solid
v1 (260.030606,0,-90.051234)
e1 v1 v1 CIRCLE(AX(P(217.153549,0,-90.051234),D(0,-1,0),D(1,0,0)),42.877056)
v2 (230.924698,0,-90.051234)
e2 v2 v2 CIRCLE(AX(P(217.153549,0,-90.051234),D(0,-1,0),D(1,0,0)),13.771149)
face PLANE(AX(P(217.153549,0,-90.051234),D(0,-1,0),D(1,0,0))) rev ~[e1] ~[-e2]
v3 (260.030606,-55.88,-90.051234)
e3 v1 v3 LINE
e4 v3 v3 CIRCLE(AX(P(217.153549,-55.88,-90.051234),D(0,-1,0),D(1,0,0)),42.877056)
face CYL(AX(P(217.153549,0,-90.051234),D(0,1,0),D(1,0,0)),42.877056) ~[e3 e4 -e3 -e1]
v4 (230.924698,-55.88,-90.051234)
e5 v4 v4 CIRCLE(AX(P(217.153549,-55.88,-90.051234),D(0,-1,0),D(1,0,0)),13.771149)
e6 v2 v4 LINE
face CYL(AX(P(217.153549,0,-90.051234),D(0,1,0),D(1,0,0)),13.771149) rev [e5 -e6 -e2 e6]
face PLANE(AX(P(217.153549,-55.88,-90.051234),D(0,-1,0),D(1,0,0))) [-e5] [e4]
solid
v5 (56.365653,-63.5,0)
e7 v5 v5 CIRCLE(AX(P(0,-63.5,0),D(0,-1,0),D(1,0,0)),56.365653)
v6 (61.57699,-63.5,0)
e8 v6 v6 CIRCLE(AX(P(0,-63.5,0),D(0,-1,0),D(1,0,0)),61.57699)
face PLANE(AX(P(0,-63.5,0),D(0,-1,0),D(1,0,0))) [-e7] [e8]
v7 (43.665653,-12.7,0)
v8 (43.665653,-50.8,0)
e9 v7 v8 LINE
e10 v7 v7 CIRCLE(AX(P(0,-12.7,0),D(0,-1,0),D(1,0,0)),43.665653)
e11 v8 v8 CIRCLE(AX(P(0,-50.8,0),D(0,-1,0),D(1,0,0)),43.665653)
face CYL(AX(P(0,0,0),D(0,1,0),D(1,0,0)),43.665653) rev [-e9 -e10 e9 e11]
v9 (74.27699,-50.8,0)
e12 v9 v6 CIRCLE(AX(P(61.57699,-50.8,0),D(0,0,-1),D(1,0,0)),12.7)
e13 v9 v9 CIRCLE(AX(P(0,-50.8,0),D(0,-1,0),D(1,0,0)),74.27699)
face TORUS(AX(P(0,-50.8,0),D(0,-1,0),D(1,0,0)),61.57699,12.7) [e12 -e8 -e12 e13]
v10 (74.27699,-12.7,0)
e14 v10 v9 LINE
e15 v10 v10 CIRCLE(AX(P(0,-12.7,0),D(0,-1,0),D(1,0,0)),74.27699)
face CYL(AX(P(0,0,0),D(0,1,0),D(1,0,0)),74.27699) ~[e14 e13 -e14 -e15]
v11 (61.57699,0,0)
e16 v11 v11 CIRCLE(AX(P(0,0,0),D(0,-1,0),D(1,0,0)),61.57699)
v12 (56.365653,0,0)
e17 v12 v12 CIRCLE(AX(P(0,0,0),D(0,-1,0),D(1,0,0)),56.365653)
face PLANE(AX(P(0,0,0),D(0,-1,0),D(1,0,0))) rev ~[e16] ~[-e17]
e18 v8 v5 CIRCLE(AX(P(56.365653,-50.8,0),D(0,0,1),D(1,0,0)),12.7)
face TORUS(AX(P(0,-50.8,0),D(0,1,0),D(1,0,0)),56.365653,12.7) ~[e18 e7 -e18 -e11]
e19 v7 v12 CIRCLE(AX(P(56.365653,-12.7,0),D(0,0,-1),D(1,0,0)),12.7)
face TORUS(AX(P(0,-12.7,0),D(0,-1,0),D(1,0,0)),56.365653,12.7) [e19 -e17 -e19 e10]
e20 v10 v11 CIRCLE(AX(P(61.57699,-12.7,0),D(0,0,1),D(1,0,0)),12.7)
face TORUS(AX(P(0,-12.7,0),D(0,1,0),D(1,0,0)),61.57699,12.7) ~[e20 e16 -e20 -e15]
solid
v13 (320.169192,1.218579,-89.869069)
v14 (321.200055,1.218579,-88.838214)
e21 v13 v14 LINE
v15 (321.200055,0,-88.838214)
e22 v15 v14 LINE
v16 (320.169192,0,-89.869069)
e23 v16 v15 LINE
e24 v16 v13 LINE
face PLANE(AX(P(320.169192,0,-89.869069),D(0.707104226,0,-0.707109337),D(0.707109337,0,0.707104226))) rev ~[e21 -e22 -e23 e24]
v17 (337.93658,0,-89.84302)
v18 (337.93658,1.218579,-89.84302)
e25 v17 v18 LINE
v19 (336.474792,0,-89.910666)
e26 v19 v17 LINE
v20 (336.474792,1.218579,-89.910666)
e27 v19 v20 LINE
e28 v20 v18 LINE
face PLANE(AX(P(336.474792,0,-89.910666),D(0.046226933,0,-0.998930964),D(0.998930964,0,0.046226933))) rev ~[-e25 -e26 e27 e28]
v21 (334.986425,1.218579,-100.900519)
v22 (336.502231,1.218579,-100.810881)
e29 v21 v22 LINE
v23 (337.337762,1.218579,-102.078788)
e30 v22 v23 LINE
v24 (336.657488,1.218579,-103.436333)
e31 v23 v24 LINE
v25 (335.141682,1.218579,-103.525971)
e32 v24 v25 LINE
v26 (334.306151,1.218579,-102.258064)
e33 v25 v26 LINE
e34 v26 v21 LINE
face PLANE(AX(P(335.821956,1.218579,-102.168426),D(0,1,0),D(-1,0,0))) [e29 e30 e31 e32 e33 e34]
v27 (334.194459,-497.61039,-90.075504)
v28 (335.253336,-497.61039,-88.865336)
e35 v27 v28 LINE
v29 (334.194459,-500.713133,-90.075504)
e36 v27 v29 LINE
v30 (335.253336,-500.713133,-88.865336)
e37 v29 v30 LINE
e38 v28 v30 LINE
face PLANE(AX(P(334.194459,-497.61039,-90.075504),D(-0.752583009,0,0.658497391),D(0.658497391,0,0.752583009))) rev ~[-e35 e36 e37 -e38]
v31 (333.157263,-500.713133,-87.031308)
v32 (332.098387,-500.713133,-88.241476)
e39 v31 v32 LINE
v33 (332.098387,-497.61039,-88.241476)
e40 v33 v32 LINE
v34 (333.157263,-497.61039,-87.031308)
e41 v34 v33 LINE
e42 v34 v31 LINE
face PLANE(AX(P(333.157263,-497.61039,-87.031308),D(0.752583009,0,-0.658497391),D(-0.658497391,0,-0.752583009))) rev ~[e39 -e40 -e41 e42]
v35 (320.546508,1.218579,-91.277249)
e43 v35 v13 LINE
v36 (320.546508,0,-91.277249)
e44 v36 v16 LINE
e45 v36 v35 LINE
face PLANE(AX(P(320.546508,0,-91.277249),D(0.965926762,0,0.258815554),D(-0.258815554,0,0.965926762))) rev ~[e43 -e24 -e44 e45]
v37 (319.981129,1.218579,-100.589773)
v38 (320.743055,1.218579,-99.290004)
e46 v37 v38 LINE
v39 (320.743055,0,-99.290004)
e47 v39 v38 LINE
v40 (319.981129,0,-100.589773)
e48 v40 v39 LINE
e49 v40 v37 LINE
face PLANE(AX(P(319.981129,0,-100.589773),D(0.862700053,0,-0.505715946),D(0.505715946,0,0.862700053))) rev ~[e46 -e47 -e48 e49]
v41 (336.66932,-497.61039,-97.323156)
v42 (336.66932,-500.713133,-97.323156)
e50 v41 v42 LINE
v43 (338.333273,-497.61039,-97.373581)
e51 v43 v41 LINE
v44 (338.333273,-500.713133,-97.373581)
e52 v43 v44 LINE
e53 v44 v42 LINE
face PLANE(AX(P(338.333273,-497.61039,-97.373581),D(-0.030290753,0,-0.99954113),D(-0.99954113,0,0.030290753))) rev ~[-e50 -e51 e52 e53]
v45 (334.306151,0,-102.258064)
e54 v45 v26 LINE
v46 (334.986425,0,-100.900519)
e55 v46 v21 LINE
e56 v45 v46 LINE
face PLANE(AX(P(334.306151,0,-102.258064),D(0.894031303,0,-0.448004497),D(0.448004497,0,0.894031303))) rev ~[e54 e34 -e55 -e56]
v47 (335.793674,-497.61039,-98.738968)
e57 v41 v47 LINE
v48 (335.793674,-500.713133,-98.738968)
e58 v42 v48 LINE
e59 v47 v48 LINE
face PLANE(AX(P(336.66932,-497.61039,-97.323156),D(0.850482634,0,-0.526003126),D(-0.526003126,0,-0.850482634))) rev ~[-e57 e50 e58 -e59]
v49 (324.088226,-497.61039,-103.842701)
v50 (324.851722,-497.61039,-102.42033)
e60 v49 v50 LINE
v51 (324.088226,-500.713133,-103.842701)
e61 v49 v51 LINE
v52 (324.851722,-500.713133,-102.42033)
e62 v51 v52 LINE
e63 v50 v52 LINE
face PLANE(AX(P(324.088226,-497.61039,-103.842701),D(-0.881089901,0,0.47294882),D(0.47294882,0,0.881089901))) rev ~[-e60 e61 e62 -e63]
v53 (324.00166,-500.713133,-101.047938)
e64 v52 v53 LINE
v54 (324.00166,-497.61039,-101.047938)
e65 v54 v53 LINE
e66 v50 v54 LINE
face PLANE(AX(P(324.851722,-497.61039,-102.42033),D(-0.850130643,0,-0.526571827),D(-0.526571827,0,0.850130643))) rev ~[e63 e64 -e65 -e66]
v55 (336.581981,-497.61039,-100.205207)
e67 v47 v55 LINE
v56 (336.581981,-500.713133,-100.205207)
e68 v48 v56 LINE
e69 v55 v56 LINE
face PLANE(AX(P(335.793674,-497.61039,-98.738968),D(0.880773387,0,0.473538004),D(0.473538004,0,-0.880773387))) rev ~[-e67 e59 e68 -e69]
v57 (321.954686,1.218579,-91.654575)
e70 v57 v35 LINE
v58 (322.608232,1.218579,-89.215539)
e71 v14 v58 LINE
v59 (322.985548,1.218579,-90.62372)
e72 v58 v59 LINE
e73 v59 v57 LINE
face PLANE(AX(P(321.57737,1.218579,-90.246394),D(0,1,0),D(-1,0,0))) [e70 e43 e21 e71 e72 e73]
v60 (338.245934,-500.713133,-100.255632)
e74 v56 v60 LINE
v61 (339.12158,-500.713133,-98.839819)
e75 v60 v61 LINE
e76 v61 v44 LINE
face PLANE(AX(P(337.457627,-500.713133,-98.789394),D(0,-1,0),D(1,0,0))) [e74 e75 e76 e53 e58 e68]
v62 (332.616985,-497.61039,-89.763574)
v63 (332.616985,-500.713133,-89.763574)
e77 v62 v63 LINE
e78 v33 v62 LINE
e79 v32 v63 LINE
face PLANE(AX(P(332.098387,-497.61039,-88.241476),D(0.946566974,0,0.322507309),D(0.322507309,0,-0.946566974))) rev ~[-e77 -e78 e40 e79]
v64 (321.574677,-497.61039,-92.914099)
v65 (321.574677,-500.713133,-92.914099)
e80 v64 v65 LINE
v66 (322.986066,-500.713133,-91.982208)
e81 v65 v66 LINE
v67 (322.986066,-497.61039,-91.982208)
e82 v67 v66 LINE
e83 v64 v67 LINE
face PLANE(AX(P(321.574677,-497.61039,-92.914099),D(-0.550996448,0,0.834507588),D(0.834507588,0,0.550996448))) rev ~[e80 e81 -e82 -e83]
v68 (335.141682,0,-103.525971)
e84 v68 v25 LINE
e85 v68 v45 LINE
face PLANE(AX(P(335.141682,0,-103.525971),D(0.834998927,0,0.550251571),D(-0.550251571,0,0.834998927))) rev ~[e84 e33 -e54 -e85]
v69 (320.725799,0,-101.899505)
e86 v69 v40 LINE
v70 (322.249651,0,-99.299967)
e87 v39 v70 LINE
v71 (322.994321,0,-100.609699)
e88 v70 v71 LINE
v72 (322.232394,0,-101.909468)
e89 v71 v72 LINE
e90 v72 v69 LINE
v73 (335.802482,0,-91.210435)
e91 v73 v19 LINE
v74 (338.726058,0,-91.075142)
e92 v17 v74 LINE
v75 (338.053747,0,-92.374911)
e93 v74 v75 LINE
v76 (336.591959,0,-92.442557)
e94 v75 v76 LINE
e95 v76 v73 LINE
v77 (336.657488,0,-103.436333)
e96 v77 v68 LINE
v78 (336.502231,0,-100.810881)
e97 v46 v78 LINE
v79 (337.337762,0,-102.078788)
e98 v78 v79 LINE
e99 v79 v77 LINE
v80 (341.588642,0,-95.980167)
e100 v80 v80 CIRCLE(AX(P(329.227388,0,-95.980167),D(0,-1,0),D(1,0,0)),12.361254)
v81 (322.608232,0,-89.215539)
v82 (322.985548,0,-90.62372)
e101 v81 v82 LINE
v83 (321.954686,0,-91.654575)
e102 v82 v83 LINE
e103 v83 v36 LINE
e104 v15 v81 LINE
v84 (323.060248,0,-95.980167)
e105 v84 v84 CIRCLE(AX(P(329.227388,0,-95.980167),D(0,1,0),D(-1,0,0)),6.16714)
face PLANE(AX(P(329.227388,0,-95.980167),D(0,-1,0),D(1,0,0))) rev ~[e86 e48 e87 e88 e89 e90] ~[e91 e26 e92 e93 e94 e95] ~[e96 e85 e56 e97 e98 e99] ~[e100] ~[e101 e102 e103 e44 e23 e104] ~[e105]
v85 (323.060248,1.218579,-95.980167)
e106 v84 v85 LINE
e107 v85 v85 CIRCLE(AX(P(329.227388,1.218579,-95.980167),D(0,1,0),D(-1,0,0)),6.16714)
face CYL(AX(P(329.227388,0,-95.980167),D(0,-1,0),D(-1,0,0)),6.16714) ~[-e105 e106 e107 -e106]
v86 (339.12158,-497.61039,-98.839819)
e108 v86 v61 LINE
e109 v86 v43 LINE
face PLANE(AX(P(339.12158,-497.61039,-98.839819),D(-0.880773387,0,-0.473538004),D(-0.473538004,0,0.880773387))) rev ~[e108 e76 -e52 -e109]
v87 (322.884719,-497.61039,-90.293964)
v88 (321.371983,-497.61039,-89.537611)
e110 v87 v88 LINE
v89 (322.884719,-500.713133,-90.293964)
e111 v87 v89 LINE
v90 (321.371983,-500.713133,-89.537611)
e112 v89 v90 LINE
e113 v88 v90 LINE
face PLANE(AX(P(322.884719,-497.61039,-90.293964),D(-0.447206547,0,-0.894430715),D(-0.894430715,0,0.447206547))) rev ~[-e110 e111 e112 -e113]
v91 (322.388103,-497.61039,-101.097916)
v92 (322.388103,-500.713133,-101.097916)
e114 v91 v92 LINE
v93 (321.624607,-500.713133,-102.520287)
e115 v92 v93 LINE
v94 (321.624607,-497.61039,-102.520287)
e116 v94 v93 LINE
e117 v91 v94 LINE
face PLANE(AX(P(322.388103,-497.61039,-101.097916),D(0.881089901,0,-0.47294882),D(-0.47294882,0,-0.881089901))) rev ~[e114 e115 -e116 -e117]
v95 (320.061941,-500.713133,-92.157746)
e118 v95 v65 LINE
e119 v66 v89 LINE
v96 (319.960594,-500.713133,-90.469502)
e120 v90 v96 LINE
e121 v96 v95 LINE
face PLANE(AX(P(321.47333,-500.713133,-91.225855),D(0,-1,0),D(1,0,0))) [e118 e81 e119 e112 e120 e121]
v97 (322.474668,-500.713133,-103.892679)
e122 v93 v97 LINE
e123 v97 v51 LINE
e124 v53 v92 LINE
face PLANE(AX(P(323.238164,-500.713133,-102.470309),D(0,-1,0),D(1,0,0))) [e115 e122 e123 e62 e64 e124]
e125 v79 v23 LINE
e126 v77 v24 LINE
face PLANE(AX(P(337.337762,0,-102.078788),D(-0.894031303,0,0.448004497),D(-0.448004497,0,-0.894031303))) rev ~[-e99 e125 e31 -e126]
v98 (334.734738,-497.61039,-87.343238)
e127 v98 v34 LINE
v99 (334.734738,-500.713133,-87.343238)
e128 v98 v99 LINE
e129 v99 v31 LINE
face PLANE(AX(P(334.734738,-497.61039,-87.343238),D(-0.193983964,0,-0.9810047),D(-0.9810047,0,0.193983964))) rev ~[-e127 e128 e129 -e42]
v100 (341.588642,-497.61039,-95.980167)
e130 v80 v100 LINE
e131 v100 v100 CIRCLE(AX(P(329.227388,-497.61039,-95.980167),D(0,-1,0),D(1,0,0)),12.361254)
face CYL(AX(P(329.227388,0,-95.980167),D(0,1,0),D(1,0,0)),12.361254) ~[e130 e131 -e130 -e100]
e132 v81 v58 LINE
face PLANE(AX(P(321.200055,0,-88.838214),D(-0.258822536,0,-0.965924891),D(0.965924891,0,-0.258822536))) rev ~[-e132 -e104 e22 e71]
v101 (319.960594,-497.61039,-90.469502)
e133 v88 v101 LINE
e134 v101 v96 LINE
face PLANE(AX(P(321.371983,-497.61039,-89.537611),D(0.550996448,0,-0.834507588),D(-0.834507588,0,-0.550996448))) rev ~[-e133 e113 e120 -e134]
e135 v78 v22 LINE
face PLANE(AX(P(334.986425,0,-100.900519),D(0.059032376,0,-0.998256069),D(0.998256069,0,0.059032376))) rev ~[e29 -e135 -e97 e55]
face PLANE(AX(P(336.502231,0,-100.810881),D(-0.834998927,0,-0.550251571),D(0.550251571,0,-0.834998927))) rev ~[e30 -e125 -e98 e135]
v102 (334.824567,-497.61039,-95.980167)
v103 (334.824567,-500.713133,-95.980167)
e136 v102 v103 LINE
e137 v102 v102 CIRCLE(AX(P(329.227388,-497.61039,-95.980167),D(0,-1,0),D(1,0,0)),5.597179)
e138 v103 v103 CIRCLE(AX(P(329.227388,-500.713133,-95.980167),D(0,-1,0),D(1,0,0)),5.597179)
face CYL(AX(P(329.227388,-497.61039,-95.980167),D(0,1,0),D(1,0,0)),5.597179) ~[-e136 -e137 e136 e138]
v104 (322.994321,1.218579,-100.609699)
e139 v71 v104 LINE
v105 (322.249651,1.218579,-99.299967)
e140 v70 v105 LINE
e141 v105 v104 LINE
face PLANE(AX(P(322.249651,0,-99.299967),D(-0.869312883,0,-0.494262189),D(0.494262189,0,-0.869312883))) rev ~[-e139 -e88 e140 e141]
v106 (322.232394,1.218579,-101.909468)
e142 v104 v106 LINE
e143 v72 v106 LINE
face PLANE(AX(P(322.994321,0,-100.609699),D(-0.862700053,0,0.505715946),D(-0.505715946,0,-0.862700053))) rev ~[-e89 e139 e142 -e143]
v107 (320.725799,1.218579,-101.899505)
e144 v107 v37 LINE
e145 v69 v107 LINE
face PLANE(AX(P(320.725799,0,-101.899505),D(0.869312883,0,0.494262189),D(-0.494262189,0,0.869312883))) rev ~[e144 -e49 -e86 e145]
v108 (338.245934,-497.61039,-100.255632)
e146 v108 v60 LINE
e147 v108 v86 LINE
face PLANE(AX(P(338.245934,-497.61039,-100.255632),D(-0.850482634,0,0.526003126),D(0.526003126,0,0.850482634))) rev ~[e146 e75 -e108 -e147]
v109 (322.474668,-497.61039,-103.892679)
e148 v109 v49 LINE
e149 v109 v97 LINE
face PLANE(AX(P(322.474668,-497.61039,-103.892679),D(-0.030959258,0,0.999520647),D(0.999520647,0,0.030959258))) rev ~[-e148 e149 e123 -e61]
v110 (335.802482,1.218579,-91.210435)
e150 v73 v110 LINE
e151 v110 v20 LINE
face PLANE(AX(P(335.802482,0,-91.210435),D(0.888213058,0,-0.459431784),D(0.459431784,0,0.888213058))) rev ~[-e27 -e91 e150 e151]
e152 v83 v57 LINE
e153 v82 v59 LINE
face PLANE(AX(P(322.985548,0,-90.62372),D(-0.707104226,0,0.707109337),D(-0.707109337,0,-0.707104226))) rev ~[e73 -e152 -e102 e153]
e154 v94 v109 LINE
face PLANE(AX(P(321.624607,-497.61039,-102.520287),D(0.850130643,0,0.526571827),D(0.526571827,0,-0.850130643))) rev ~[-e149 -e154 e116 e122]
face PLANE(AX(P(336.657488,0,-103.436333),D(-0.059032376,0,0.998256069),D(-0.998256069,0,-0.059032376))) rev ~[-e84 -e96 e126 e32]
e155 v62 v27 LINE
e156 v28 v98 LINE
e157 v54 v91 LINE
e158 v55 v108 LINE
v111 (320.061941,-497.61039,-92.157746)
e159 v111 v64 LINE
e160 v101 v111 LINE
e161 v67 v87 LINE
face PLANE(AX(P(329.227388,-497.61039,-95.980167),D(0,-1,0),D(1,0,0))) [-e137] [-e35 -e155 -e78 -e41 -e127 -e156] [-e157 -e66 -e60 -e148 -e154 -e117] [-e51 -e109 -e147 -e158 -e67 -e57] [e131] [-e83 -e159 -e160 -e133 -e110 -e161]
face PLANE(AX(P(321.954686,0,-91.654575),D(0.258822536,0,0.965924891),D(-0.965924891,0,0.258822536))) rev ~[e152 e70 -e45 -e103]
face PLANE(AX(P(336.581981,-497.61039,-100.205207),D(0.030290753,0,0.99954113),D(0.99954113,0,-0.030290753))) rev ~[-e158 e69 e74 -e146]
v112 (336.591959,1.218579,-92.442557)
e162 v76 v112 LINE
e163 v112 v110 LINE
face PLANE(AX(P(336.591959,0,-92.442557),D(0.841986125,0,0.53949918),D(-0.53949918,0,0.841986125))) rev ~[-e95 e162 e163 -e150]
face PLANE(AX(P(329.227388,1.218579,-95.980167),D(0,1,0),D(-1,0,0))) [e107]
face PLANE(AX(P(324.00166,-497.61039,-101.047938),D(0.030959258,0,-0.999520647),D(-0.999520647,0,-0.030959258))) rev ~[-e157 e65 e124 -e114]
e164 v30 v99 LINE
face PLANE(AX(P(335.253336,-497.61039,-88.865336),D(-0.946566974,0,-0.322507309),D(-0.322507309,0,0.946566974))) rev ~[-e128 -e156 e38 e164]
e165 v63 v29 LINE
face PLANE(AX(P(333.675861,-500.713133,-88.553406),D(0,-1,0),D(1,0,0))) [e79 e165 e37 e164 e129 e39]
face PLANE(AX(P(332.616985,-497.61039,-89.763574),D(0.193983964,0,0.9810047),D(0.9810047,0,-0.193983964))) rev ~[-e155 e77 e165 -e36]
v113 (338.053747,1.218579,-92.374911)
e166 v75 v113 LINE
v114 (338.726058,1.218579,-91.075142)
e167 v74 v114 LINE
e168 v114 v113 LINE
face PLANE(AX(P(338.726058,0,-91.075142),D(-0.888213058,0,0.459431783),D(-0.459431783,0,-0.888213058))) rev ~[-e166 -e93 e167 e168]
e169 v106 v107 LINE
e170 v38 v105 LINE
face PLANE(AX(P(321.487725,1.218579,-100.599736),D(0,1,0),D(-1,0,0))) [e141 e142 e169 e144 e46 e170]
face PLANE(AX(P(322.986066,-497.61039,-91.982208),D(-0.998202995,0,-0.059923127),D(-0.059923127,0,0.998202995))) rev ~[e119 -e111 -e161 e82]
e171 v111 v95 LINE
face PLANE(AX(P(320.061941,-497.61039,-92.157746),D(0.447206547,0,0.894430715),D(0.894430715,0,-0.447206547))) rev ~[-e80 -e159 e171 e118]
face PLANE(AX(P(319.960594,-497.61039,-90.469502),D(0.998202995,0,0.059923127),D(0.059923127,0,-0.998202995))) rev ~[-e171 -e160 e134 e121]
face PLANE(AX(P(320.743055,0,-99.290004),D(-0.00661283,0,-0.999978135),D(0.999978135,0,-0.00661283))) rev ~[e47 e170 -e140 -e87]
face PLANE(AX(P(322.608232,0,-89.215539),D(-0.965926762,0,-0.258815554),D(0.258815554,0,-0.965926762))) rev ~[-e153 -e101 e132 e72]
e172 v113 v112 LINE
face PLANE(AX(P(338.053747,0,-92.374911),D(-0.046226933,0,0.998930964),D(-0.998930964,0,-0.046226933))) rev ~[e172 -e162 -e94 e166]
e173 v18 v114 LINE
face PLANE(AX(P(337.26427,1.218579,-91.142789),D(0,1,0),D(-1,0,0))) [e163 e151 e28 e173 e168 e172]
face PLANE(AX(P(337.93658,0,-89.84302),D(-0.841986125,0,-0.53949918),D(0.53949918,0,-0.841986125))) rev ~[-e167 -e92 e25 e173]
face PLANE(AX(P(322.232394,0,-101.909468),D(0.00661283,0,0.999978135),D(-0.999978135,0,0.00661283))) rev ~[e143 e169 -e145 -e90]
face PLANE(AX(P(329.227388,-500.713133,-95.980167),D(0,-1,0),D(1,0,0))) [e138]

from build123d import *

# Parameters (mm, degrees)
F1_R      = 74.2769896622
F1_R_2    = 43.6656527846
F2_DEPTH  = 63.5
F3_R      = 12.7
F4_R      = 42.877056386
F4_R_2    = 13.7711488701
F5_DEPTH  = 55.88
F9_R      = 12.3612543208
F10_DEPTH = 497.6103901863
F11_R     = 5.5971792764
F12_DEPTH = 3.1027426012
F13_R     = 6.167140202
F14_DEPTH = 1.218579011


# Not quite as in the source:
# - the program builds the solid bodies; features that only make, move or delete a surface that nothing else refers to are left out


with BuildPart() as f2:
    # F1 (on face) → F2 (new body)
    with BuildSketch(Plane.XZ):
        Circle(F1_R)
        Circle(F1_R_2, mode=Mode.SUBTRACT)
    extrude(amount=F2_DEPTH)

    # F3
    f3_edges = [f2.edges().sort_by_distance(p)[0] for p in [
        (-74.27699, -63.5, 0),
        (-74.27699, 0, 0),
        (-43.665653, -63.5, 0),
        (-43.665653, 0, 0),
    ]]
    fillet(f3_edges, radius=F3_R)


with BuildPart() as f5:
    # F4 (on Front) → F5 (new body)
    with BuildSketch(Plane.XZ):
        with Locations((217.1535491943, -90.0512337685)):
            Circle(F4_R)
        with Locations((217.1535491943, -90.0512337685)):
            Circle(F4_R_2, mode=Mode.SUBTRACT)
    extrude(amount=F5_DEPTH)


with BuildPart() as f10:
    # F9 (on Front) → F10 (new body)
    with BuildSketch(Plane.XZ):
        with Locations((329.2273879051, -95.9801673889)):
            Circle(F9_R)
    extrude(amount=F10_DEPTH)

    # F11 (on face) → F12 (join)
    with BuildSketch(Plane.XZ.offset(497.6103901863)):
        Polygon((335.2533358502, -88.8653362571), (334.7347378731, -87.3432382941), (333.1572633815, -87.0313083352), (332.0983868671, -88.2414763392), (332.6169848442, -89.7635743022), (334.1944593358, -90.0755042611), align=None)
        Polygon((338.2459338014, -100.2556322923), (339.1215801239, -98.8398194313), (338.3332733805, -97.3735810408), (336.6693203146, -97.3231555113), (335.7936739922, -98.7389683723), (336.5819807356, -100.2052067628), align=None)
        Polygon((324.0882255018, -103.8427009407), (324.8517215252, -102.4203300476), (324.0016602098, -101.0479376491), (322.3881028711, -101.0979161438), (321.6246068478, -102.5202870369), (322.4746681631, -103.8926794354), align=None)
        Polygon((321.574677267, -92.9140994987), (322.9860663414, -91.9822081923), (322.8847193337, -90.2939637461), (321.3719832517, -89.5376106062), (319.9605941772, -90.4695019126), (320.0619411849, -92.1577463588), align=None)
        with Locations((329.2273879051, -95.9801673889)):
            Circle(F11_R)
    extrude(amount=F12_DEPTH)

    # F13 (on face) → F14 (join)
    with BuildSketch(Plane(origin=(0, 0, 0), x_dir=(-1, 0, 0), z_dir=(0, 1, 0))):
        with Locations((-329.2273879051, -95.9801673889)):
            Circle(F13_R)
        Polygon((-321.9546855155, -91.6545746838), (-320.5465078354, -91.2772491574), (-320.1691924867, -89.8690687502), (-321.2000548181, -88.8382138694), (-322.6082324982, -89.2155393958), (-322.9855478469, -90.623719803), align=None)
        Polygon((-338.0537469964, -92.3749109234), (-336.5919589996, -92.4425572157), (-335.8024815936, -91.2104348217), (-336.4747921844, -89.9106661354), (-337.9365801811, -89.8430198431), (-338.7260575871, -91.0751422371), align=None)
        Polygon((-335.1416822645, -103.525971147), (-334.3061506748, -102.2580638528), (-334.9864248065, -100.9005186234), (-336.5022305278, -100.8108806882), (-337.3377621174, -102.0787879825), (-336.6574879857, -103.4363332119), align=None)
        Polygon((-322.2323943953, -101.909467741), (-320.7257986069, -101.8995046616), (-319.9811289926, -100.5897728958), (-320.7430551667, -99.2900042095), (-322.2496509552, -99.299967289), (-322.9943205695, -100.6096990548), align=None)
    extrude(amount=F14_DEPTH)


solid = Compound([f2.part, f5.part, f10.part])
